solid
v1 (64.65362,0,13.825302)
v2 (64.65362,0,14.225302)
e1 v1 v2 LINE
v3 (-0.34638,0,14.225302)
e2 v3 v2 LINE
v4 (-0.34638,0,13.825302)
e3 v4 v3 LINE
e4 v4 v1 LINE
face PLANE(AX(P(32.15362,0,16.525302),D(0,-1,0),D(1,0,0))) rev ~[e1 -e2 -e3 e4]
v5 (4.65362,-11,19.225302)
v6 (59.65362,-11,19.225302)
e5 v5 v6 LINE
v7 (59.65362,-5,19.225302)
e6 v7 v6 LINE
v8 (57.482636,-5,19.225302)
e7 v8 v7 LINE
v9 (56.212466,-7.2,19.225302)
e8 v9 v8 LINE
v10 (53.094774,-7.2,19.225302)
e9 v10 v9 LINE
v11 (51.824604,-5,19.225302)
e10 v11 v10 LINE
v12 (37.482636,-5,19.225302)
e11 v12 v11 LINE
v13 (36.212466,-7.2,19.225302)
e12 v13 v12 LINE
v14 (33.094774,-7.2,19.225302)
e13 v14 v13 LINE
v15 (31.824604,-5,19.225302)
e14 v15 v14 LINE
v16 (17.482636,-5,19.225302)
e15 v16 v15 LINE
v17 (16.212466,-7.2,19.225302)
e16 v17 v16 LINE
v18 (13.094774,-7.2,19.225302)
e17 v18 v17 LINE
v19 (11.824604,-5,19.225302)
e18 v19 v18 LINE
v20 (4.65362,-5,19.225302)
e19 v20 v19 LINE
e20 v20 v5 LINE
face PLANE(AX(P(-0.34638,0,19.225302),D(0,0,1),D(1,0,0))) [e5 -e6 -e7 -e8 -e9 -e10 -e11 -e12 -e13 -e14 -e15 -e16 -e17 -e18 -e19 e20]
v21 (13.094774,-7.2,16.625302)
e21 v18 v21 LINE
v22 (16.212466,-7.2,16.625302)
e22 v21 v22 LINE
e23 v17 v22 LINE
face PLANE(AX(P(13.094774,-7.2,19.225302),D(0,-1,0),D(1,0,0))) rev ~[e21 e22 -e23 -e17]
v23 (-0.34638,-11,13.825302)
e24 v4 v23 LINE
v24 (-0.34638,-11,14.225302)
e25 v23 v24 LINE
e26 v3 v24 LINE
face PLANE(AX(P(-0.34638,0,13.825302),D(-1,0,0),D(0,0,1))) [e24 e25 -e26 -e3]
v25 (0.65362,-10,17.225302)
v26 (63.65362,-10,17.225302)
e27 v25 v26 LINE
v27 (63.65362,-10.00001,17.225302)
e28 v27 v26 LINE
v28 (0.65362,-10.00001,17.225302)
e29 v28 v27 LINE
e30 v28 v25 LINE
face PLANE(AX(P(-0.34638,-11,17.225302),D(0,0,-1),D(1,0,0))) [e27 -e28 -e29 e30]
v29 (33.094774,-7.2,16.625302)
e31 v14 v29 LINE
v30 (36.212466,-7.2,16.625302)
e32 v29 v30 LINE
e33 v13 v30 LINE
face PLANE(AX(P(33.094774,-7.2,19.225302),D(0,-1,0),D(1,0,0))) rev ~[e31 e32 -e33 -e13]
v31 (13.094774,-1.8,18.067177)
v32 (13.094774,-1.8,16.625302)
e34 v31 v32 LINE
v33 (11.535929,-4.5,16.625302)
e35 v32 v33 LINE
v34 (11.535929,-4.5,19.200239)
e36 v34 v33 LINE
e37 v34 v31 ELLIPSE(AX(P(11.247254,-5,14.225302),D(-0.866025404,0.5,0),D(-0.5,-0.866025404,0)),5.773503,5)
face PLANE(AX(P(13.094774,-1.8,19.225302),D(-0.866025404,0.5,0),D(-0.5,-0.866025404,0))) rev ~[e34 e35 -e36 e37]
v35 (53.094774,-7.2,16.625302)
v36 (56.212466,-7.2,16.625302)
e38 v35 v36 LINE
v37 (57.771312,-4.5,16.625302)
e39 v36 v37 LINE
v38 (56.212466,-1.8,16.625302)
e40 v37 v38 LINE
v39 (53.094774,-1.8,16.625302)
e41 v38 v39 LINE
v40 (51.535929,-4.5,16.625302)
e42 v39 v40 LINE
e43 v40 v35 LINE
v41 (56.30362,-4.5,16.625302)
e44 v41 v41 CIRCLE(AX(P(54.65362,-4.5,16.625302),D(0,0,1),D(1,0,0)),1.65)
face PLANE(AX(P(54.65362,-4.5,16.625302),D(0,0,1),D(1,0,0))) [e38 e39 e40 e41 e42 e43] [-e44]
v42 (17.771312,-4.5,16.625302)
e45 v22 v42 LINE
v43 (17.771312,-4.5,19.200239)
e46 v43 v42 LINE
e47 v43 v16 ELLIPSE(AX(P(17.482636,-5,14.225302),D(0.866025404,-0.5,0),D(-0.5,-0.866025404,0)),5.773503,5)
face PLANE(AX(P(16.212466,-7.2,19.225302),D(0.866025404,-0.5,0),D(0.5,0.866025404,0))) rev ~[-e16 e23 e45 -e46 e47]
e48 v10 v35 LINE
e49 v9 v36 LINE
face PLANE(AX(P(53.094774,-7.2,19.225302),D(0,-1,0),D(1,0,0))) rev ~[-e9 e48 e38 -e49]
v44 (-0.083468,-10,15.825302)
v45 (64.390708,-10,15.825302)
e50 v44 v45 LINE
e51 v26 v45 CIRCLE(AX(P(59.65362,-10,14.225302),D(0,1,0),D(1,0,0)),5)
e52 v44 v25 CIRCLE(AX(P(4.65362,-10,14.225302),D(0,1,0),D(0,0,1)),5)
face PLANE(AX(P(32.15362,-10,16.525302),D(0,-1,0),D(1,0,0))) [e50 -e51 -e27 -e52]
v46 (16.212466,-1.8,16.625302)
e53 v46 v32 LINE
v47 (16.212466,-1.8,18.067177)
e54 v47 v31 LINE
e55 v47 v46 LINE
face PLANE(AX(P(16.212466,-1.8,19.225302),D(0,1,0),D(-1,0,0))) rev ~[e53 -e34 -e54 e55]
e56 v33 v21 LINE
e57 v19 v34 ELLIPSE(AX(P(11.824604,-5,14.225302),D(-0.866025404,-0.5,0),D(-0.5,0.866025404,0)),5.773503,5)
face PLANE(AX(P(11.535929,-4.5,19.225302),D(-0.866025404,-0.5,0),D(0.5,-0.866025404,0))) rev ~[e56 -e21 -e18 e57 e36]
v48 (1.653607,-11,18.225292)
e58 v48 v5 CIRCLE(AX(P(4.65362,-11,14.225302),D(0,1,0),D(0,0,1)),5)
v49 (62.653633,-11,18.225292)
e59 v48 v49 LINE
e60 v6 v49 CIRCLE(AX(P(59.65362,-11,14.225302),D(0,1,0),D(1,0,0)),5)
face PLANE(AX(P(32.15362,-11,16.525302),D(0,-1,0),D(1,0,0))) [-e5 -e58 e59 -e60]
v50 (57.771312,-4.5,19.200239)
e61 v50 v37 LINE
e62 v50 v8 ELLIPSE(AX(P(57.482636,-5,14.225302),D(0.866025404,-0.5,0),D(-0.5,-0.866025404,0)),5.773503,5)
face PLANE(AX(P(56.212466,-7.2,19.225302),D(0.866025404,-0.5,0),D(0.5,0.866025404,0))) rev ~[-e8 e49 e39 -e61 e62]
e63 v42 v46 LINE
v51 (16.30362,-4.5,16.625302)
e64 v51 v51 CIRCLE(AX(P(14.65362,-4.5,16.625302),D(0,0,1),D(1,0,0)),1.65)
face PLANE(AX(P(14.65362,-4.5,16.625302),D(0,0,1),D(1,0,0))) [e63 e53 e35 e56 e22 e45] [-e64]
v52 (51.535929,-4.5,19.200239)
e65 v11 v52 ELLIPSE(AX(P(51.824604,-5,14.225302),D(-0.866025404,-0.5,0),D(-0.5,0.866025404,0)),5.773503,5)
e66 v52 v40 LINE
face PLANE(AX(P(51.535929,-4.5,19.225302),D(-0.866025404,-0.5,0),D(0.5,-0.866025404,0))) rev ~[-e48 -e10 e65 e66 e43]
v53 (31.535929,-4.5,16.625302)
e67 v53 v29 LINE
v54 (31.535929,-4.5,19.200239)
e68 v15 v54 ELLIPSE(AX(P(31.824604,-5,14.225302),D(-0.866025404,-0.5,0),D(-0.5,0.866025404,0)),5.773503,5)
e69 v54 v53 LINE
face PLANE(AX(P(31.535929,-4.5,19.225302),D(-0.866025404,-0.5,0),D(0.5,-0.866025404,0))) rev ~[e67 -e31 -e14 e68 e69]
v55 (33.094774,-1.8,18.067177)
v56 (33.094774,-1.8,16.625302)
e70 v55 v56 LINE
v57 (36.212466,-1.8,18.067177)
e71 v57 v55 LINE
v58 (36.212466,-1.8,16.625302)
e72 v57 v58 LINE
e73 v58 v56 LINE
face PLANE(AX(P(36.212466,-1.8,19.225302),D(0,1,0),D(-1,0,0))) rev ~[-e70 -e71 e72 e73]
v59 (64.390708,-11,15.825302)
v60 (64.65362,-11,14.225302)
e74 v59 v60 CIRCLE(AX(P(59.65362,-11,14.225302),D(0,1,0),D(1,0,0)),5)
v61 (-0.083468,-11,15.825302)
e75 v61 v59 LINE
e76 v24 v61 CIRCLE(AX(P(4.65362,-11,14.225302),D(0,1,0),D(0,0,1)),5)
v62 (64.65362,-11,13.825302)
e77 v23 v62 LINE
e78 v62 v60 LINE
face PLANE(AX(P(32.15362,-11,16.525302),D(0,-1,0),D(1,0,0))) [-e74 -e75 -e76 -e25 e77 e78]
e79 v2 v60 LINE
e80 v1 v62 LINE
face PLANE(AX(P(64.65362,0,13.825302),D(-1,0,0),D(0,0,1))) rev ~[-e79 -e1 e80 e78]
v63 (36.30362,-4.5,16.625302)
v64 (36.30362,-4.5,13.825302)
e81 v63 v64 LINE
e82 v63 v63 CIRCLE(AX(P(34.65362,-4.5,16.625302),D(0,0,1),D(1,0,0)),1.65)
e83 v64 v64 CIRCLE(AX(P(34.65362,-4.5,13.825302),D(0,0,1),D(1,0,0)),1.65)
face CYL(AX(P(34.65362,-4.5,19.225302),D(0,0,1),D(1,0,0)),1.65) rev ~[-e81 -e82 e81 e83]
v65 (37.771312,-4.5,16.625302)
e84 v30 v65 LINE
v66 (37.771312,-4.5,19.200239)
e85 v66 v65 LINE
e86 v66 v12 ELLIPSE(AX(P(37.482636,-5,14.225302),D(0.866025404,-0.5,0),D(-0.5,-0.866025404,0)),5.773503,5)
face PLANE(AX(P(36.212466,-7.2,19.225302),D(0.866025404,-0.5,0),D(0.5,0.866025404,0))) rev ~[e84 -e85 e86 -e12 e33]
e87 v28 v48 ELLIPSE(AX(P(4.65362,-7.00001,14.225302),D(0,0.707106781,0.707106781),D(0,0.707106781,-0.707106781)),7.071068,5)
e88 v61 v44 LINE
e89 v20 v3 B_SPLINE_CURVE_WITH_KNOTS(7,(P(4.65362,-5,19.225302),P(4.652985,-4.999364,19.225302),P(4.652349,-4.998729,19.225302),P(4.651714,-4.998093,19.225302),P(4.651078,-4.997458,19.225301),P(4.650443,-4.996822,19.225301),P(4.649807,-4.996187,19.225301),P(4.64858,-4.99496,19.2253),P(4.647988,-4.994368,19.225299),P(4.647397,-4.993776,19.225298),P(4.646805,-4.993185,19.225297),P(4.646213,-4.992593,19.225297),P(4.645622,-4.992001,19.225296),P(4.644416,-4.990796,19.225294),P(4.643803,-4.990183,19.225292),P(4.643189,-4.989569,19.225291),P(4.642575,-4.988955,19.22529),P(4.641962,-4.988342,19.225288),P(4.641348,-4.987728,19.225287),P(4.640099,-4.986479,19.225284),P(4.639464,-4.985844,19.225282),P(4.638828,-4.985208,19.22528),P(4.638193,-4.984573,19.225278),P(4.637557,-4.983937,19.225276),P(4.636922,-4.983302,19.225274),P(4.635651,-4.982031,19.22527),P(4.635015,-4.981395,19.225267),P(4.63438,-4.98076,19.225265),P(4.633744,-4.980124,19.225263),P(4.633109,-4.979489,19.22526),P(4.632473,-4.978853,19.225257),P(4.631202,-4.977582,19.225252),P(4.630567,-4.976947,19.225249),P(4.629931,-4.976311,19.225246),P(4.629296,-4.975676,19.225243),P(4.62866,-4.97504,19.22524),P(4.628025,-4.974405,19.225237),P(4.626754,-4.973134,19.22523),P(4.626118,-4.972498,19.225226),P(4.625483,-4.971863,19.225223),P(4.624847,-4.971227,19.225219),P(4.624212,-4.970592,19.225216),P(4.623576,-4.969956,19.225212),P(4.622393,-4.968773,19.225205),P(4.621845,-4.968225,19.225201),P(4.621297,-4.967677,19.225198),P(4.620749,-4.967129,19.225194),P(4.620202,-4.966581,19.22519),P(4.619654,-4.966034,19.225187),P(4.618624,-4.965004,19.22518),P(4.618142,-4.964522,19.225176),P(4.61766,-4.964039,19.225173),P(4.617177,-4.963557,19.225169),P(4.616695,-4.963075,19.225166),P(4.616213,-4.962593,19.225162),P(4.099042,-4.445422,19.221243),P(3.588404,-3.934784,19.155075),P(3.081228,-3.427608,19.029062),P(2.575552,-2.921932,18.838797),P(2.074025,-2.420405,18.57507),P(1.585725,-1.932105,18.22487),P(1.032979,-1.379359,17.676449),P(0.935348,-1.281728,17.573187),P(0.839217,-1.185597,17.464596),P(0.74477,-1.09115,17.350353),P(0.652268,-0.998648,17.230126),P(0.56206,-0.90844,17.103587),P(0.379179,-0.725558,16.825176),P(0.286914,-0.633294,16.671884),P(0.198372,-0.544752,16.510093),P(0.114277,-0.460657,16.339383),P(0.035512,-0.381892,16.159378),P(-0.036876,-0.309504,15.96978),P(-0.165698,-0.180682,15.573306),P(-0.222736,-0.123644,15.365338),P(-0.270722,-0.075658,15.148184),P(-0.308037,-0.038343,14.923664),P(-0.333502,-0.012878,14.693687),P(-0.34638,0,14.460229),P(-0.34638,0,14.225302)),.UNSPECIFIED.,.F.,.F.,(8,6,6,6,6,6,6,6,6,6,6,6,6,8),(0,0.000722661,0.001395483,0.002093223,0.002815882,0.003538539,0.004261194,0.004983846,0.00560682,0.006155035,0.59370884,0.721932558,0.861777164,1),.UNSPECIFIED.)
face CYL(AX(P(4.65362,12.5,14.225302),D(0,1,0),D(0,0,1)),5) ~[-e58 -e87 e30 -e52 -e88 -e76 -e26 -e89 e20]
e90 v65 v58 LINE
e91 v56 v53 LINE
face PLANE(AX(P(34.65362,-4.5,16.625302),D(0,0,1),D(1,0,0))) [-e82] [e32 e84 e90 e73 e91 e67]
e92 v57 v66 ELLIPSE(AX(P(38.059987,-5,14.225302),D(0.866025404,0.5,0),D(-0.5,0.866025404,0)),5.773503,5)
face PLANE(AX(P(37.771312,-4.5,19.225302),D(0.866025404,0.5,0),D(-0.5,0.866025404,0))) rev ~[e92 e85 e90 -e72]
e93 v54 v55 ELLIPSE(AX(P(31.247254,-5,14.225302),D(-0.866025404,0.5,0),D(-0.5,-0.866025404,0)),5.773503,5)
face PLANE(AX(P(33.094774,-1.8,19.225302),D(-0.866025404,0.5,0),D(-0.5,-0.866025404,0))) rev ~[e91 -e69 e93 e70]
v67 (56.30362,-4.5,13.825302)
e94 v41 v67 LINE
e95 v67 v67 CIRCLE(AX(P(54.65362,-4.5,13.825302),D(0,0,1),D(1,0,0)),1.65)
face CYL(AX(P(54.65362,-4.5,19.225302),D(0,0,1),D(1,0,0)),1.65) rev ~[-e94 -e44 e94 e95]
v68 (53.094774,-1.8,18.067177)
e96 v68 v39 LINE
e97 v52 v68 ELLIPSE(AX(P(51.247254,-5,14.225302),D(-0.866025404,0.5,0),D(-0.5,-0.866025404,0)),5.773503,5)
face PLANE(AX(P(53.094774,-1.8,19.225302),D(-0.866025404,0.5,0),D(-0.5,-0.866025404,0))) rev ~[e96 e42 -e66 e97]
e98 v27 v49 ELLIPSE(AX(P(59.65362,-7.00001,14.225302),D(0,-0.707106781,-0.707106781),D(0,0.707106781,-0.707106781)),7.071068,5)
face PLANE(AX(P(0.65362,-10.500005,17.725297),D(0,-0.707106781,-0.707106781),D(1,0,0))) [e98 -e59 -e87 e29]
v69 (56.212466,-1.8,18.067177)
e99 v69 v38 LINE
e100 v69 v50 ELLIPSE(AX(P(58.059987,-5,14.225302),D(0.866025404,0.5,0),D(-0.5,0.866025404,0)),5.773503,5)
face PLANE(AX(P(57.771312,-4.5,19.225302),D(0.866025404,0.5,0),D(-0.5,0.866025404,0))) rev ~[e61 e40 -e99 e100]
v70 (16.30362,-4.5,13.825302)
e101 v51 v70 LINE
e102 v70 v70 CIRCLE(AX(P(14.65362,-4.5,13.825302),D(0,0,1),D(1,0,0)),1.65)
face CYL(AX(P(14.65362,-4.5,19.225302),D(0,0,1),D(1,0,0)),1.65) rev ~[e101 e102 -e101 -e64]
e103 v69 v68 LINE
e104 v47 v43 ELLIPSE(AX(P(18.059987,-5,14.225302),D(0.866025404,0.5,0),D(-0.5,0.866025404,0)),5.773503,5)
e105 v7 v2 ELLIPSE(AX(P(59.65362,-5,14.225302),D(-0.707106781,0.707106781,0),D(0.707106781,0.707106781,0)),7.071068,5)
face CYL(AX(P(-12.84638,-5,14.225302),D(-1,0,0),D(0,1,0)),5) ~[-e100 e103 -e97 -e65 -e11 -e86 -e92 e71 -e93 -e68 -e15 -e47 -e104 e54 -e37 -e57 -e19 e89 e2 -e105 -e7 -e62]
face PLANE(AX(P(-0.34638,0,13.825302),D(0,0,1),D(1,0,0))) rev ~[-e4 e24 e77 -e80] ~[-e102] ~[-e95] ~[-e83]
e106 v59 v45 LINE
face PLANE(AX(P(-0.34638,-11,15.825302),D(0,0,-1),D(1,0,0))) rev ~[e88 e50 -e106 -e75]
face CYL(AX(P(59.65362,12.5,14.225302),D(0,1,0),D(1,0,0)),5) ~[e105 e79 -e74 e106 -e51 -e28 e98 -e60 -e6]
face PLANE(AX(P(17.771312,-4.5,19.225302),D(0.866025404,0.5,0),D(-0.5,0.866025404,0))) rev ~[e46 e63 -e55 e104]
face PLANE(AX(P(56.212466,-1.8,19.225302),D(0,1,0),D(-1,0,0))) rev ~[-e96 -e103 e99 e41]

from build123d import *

# Parameters (mm, degrees)
F0_W        = 65
F0_H        = 5.4
F1_DEPTH    = 11
F2_W        = 65
F2_H        = 1.4
F3_DEPTH    = 1
F4_R        = 1.65
F5_DEPTH    = 25
F7_DEPTH    = 2.6
F8_T1_DEPTH = 36
F8_T3_DEPTH = 90
F9_SIZE     = 0.99999


# Not quite as in the source:
# - a fillet or chamfer that OpenCascade refuses, or shapes differently, is made with other operations: its cross-section is extruded or revolved along the edge and cut away or added
# - a fillet or chamfer is up to 0.001 mm smaller than in the source, because OpenCascade refuses the exact size


with BuildPart() as f1:
    # F0 (on Front) → F1 (new body)
    with BuildSketch(Plane.XZ):
        with Locations((32.1536201239, 16.5253020123)):
            Rectangle(F0_W, F0_H)
    extrude(amount=F1_DEPTH)

    # F2 (on face) → F3 (cut)
    with BuildSketch(Plane.XZ.offset(11)):
        with Locations((32.1536201239, 16.5253020123)):
            Rectangle(F2_W, F2_H)
    extrude(amount=-F3_DEPTH, mode=Mode.SUBTRACT)

    # F4 (on face) → F5 (cut)
    with BuildSketch(Plane.XY.offset(19.2253020123)):
        with Locations((14.6536201239, -4.5)):
            Circle(F4_R)
        with Locations((34.6536201239, -4.5)):
            Circle(F4_R)
        with Locations((54.6536201239, -4.5)):
            Circle(F4_R)
    extrude(amount=-F5_DEPTH, mode=Mode.SUBTRACT)

    # F6 (on face) → F7 (cut)
    with BuildSketch(Plane.XY.offset(19.2253020123)):
        Polygon((13.0947743971, -7.2), (16.2124658507, -7.2), (17.7713115775, -4.5), (16.2124658507, -1.8), (13.0947743971, -1.8), (11.5359286702, -4.5), align=None)
        Polygon((33.0947743971, -7.2), (36.2124658507, -7.2), (37.7713115775, -4.5), (36.2124658507, -1.8), (33.0947743971, -1.8), (31.5359286702, -4.5), align=None)
        Polygon((53.0947743971, -7.2), (56.2124658507, -7.2), (57.7713115775, -4.5), (56.2124658507, -1.8), (53.0947743971, -1.8), (51.5359286702, -4.5), align=None)
    extrude(amount=-F7_DEPTH, mode=Mode.SUBTRACT)

    # F8: fillet of radius 5 on 3 edges, made by hand

    # F8_s2 → F8_t1 (cut)
    with BuildSketch(Plane.XZ.offset(-12.5)):
        with BuildLine():
            ThreePointArc((64.6536201239, 14.2253020123), (63.1891540298, 17.7608359182), (59.6536201239, 19.2253020123))
            Line((59.6536201239, 19.2253020123), (64.6536201239, 19.2253020123))
            Line((64.6536201239, 19.2253020123), (64.6536201239, 14.2253020123))
        make_face()
        with BuildLine():
            ThreePointArc((4.6536201239, 19.2253020123), (1.1180862179, 17.7608359182), (-0.3463798761, 14.2253020123))
            Line((-0.3463798761, 14.2253020123), (-0.3463798761, 19.2253020123))
            Line((-0.3463798761, 19.2253020123), (4.6536201239, 19.2253020123))
        make_face()
    extrude(amount=F8_T1_DEPTH, mode=Mode.SUBTRACT)

    # F8_s4 → F8_t3 (cut)
    with BuildSketch(Plane.YZ.offset(-12.8463798761)):
        with BuildLine():
            ThreePointArc((0, 14.2253020123), (-1.4644660941, 17.7608359182), (-5, 19.2253020123))
            Line((-5, 19.2253020123), (0, 19.2253020123))
            Line((0, 19.2253020123), (0, 14.2253020123))
        make_face()
    extrude(amount=F8_T3_DEPTH, mode=Mode.SUBTRACT)

    # F9 (size 1 in the source; OpenCascade refuses exactly that, so slightly less here)
    f9_edges = [f1.edges().sort_by_distance(p)[0] for p in [
        (32.15362, -11, 17.225302),
    ]]
    chamfer(f9_edges, length=F9_SIZE)


solid = f1.part
